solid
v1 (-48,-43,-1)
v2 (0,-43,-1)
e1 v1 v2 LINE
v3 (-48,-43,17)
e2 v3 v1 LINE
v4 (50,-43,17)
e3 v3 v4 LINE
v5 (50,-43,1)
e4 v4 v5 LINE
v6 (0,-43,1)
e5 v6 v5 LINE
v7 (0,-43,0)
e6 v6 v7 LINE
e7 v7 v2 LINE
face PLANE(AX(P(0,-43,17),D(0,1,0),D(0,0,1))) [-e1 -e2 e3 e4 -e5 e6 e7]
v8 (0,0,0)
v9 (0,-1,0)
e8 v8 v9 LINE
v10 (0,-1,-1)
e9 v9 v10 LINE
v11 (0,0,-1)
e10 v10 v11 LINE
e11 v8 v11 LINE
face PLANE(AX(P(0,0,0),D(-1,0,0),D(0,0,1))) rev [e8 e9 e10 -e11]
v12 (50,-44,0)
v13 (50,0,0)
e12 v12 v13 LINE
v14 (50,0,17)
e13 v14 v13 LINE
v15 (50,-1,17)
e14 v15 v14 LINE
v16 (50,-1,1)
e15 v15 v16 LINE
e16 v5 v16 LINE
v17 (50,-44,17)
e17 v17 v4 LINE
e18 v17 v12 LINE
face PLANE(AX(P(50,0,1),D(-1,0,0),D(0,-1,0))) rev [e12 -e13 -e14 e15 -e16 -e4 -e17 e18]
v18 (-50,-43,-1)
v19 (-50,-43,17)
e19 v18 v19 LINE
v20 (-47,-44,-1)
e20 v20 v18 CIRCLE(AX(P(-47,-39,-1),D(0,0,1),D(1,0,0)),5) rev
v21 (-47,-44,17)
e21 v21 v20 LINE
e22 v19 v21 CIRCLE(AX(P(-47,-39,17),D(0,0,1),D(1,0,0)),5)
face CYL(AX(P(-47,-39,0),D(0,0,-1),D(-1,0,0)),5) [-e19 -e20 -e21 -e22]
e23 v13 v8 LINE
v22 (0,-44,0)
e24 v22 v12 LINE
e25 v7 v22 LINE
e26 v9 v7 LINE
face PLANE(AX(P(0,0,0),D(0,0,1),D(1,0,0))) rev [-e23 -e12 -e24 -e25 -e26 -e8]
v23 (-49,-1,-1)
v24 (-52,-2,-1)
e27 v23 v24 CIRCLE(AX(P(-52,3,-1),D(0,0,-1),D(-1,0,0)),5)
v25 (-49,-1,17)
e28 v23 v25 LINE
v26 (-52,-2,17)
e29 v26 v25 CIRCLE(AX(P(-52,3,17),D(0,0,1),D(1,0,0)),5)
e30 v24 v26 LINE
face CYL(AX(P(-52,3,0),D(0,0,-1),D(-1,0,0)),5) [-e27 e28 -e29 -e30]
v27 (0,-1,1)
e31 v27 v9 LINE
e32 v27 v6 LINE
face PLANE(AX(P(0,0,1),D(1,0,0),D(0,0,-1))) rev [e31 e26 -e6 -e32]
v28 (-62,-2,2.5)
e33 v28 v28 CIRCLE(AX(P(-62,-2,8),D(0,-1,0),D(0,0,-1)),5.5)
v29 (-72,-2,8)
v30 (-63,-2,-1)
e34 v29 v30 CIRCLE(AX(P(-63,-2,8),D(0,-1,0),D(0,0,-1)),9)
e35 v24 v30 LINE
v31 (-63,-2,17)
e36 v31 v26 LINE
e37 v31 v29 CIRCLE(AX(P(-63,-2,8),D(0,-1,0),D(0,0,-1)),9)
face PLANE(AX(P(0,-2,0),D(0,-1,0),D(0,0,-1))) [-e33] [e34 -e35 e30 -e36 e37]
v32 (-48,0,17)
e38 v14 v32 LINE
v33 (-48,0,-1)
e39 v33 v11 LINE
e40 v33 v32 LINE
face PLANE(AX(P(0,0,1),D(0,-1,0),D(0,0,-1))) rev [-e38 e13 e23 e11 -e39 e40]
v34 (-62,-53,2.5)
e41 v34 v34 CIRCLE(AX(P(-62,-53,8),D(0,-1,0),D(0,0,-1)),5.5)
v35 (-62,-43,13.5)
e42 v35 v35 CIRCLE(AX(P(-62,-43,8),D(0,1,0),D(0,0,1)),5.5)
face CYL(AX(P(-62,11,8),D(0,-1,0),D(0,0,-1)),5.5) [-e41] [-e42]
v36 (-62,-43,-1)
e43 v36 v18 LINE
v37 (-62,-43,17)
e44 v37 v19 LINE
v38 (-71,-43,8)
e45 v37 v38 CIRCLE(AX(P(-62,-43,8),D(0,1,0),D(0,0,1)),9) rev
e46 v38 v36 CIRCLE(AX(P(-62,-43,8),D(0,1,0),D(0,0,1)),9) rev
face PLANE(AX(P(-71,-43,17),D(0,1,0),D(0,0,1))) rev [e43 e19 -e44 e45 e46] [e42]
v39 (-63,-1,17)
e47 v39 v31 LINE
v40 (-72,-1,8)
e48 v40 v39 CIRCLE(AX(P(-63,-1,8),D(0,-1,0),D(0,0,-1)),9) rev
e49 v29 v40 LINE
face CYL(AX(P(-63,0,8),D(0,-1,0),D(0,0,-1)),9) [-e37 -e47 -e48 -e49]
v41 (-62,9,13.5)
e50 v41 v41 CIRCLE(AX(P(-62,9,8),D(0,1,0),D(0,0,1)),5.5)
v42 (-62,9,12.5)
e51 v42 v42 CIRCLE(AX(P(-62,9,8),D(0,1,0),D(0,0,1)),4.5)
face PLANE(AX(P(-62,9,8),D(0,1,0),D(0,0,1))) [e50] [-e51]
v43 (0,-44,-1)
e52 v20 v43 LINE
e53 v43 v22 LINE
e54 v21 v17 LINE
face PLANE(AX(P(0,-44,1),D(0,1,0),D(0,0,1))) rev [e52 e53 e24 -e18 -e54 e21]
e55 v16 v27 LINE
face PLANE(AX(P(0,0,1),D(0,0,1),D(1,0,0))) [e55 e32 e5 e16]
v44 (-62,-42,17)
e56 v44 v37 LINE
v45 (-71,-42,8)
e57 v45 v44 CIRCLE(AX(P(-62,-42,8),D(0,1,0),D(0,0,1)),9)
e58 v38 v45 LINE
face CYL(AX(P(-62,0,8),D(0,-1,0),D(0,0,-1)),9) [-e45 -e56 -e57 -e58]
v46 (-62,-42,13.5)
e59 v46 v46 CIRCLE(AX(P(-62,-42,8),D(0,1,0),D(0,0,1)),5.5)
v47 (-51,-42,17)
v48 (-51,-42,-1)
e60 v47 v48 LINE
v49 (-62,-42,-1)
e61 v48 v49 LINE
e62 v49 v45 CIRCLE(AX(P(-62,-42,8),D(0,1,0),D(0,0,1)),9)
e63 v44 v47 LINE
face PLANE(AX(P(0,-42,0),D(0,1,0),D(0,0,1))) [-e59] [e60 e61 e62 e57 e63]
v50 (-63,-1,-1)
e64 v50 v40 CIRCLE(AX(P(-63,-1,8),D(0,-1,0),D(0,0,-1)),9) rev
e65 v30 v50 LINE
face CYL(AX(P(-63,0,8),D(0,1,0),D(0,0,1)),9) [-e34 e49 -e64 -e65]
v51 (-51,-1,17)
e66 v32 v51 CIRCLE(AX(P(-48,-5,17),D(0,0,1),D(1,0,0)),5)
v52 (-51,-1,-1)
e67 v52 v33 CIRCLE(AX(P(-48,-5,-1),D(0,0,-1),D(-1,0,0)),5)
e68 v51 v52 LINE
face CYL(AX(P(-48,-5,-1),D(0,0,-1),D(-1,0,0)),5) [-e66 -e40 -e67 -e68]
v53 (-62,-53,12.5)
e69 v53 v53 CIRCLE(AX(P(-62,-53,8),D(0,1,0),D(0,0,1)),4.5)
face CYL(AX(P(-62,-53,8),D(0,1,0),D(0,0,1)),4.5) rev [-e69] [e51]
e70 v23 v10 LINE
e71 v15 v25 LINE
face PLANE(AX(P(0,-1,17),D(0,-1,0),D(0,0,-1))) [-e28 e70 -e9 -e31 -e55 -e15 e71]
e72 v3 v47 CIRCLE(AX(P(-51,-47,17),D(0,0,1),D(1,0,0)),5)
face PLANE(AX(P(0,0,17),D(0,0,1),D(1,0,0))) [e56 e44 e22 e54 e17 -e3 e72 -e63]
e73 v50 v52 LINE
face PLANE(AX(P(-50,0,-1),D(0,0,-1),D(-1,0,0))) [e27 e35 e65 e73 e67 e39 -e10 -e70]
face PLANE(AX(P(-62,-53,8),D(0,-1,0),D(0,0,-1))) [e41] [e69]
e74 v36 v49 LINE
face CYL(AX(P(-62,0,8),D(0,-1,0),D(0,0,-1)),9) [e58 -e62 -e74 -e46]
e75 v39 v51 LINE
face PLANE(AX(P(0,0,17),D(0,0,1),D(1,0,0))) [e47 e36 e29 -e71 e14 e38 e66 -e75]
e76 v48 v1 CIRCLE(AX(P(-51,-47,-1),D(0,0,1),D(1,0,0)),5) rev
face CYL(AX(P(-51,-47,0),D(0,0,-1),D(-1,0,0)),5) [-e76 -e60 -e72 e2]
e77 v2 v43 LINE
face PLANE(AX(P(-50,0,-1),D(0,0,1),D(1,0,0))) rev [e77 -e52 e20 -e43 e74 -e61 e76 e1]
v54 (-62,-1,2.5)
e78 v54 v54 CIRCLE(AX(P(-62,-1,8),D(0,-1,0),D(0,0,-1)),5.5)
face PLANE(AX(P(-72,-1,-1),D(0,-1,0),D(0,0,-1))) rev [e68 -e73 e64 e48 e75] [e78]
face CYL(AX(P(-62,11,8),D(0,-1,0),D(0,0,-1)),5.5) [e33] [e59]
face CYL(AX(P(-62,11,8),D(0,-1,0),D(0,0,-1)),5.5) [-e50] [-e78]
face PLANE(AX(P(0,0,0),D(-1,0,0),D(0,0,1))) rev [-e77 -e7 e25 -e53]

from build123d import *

# Parameters (mm, degrees)
CROQUIS1_W                    = 50
CROQUIS1_H                    = 44
SALIENTE_EXTRUIR1_DEPTH       = 1
CROQUIS2_W                    = 50
CROQUIS2_H                    = 1
SALIENTE_EXTRUIR2_DEPTH       = 16
CROQUIS3_W                    = 1
CROQUIS3_H                    = 1
SALIENTE_EXTRUIR3_DEPTH       = 50
CROQUIS4_W                    = 1
CROQUIS4_H                    = 18
SALIENTE_EXTRUIR4_DEPTH       = 1
CROQUIS6_W                    = 1
CROQUIS6_H                    = 18
SALIENTE_EXTRUIR5_DEPTH       = 1
CROQUIS12_W                   = 1
CROQUIS12_H                   = 18
SALIENTE_EXTRUIR11_DEPTH      = 1
CROQUIS13_W                   = 18
CROQUIS13_H                   = 1
SALIENTE_EXTRUIR12_DEPTH      = 21
CROQUIS14_W                   = 18
CROQUIS14_H                   = 1
SALIENTE_EXTRUIR13_DEPTH      = 21
REDONDEO4_R                   = 9
REDONDEO5_R                   = 9
CROQUIS15_W                   = 18
CROQUIS15_H                   = 1
SALIENTE_EXTRUIR14_DEPTH      = 1
CROQUIS16_W                   = 18
CROQUIS16_H                   = 1
SALIENTE_EXTRUIR15_DEPTH      = 1
REDONDEO6_R                   = 5
REDONDEO7_R                   = 5
SALIENTE_EXTRUIR22_DEPTH      = 10
SALIENTE_EXTRUIR22_DEPTH_BACK = 54
CROQUIS17_R                   = 5.5
CORTAR_EXTRUIR5_START         = -2
CROQUIS25_R                   = 5.5
CORTAR_EXTRUIR5_DEPTH         = 2
CROQUIS26_R                   = 4.5
CORTAR_EXTRUIR6_DEPTH         = 97.524608261


# Some blends are built 0.0001 mm under size
with BuildPart() as part:
    # Croquis1 → Saliente-Extruir1 (new body)
    with BuildSketch(Plane.XY):
        with Locations((25, -22)):
            Rectangle(CROQUIS1_W, CROQUIS1_H)
    extrude(amount=SALIENTE_EXTRUIR1_DEPTH)

    # Croquis2 → Saliente-Extruir2 (add)
    with BuildSketch(Plane.XY.offset(1)):
        with Locations((25, -0.5)):
            Rectangle(CROQUIS2_W, CROQUIS2_H)
        with Locations((25, -43.5)):
            Rectangle(CROQUIS2_W, CROQUIS2_H)
    extrude(amount=SALIENTE_EXTRUIR2_DEPTH)

    # Croquis3 → Saliente-Extruir3 (add)
    with BuildSketch(Plane.ZY):
        Polygon((0, -44), (17, -44), (17, -43), (1, -43), (0, -43), align=None)
        with Locations((-0.5, -43.5)):
            Rectangle(CROQUIS3_W, CROQUIS3_H)
        with Locations((-0.5, -0.5)):
            Rectangle(CROQUIS3_W, CROQUIS3_H)
        Polygon((0, 0), (0, -1), (1, -1), (17, -1), (17, 0), align=None)
    extrude(amount=SALIENTE_EXTRUIR3_DEPTH)



with BuildPart() as body_2:
    # Croquis4 → Saliente-Extruir4 (new body)
    with BuildSketch(Plane.XZ.offset(1)):
        with Locations((-50.5, 8)):
            Rectangle(CROQUIS4_W, CROQUIS4_H)
    extrude(amount=SALIENTE_EXTRUIR4_DEPTH)


with BuildPart() as part_1:
    add(part.part)

    add(body_2.part)  # Saliente-Extruir5 merges body 2
    # Croquis6 → Saliente-Extruir5 (add)
    with BuildSketch(Plane(origin=(0, -1, 0), x_dir=(1, 0, 0), z_dir=(0, 1, 0))):
        with Locations((-50.5, -8)):
            Rectangle(CROQUIS6_W, CROQUIS6_H)
    extrude(amount=SALIENTE_EXTRUIR5_DEPTH)

    # Croquis12 → Saliente-Extruir11 (add)
    with BuildSketch(Plane(origin=(0, -43, 0), x_dir=(1, 0, 0), z_dir=(0, 1, 0))):
        with Locations((-49.5, -8)):
            Rectangle(CROQUIS12_W, CROQUIS12_H)
    extrude(amount=SALIENTE_EXTRUIR11_DEPTH)

    # Croquis13 → Saliente-Extruir12 (add)
    with BuildSketch(Plane.ZY.offset(50)):
        with Locations((8, -42.5)):
            Rectangle(CROQUIS13_W, CROQUIS13_H)
    extrude(amount=SALIENTE_EXTRUIR12_DEPTH)

    # Croquis14 → Saliente-Extruir13 (add)
    with BuildSketch(Plane.ZY.offset(51)):
        with Locations((8, -1.5)):
            Rectangle(CROQUIS14_W, CROQUIS14_H)
    extrude(amount=SALIENTE_EXTRUIR13_DEPTH)

    # Redondeo4
    redondeo4_edges = [part_1.edges().sort_by_distance(p)[0] for p in [
        (-72, -1.5, -1),
        (-72, -1.5, 17),
    ]]
    fillet(redondeo4_edges, radius=REDONDEO4_R - 0.0001)  # a hair under: the kernel refuses the full size

    # Redondeo5
    redondeo5_edges = [part_1.edges().sort_by_distance(p)[0] for p in [
        (-71, -42.5, -1),
        (-71, -42.5, 17),
    ]]
    fillet(redondeo5_edges, radius=REDONDEO5_R - 0.0001)  # a hair under: the kernel refuses the full size

    # Croquis15 → Saliente-Extruir14 (add)
    with BuildSketch(Plane(origin=(-49, 0, 0), x_dir=(0, 0, -1), z_dir=(1, 0, 0))):
        with Locations((-8, -42.5)):
            Rectangle(CROQUIS15_W, CROQUIS15_H)
    extrude(amount=SALIENTE_EXTRUIR14_DEPTH)

    # Croquis16 → Saliente-Extruir15 (add)
    with BuildSketch(Plane(origin=(-50, 0, 0), x_dir=(0, 0, -1), z_dir=(1, 0, 0))):
        with Locations((-8, -1.5)):
            Rectangle(CROQUIS16_W, CROQUIS16_H)
    extrude(amount=SALIENTE_EXTRUIR15_DEPTH)

    # Redondeo6
    # the kernel refuses this fillet: 5 mm, written as the material it takes off along each edge
    with BuildSketch(Plane(origin=(-48, -42, -8.5), x_dir=(-1, 0, 0), z_dir=(0, 0, 1))) as redondeo6_piece_1:
        with BuildLine():
            CenterArc((3, 5), REDONDEO6_R, 233.130102354, 36.869897646)
            Line((0, 1), (-0.06, 0.92))
            ThreePointArc((-0.06, 0.92), (-0.1, 0.5), (-0.1, 0))
            Line((-0.1, 0), (0, -0.1))
            Line((0, -0.1), (3, -0.1))
            Line((3, -0.1), (3, 0))
        make_face()
    extrude(amount=33, mode=Mode.SUBTRACT)
    with BuildSketch(Plane(origin=(-49, -2, -8.5), x_dir=(0, 1, 0), z_dir=(0, 0, 1))) as redondeo6_piece_2:
        with BuildLine():
            CenterArc((5, 3), REDONDEO6_R, 180, 36.869897646)
            Line((0, 3), (-0.1, 3))
            Line((-0.1, 3), (-0.1, 0))
            Line((-0.1, 0), (0, -0.1))
            ThreePointArc((0, -0.1), (0.5, -0.1), (0.92, -0.06))
            Line((0.92, -0.06), (1, 0))
        make_face()
    extrude(amount=33, mode=Mode.SUBTRACT)

    # Redondeo7
    # the kernel refuses this fillet: 5 mm, written as the material it takes off along each edge
    with BuildSketch(Plane(origin=(-50, -44, 24.5), x_dir=(1, 0, 0), z_dir=(0, 0, -1)), Plane(origin=(-51, 0, -8.5), x_dir=(1, 0, 0), z_dir=(0, 0, 1))) as redondeo7_piece_1:
        with BuildLine():
            CenterArc((3, -5), REDONDEO7_R, 90, 36.869897646)
            Line((0, -1), (-0.06, -0.92))
            ThreePointArc((-0.06, -0.92), (-0.1, -0.5), (-0.1, 0))
            Line((-0.1, 0), (0, 0.1))
            Line((0, 0.1), (3, 0.1))
            Line((3, 0.1), (3, 0))
        make_face()
    extrude(amount=33, mode=Mode.SUBTRACT)

    # Croquis17 → Saliente-Extruir22 (add, two sides: drawn at the far end of the back side and taken through both)
    with BuildSketch(Plane.XZ.offset(43).offset(-SALIENTE_EXTRUIR22_DEPTH_BACK)):
        with Locations(Location((-62, 8, 0), (0, 0, 270))):
            Circle(CROQUIS17_R)
    extrude(amount=SALIENTE_EXTRUIR22_DEPTH + SALIENTE_EXTRUIR22_DEPTH_BACK)

    # Croquis25 → Cortar-Extruir5 (cut)
    with BuildSketch(Plane(origin=(0, 11, 0), x_dir=(1, 0, 0), z_dir=(0, 1, 0)).offset(CORTAR_EXTRUIR5_START)):
        with Locations(Location((-62, -8, 0), (0, 0, 90))):
            Circle(CROQUIS25_R)
    extrude(amount=CORTAR_EXTRUIR5_DEPTH, mode=Mode.SUBTRACT)

    # Croquis26 → Cortar-Extruir6 (cut, through all)
    with BuildSketch(Plane(origin=(0, 9, 0), x_dir=(1, 0, 0), z_dir=(0, 1, 0))):
        with Locations(Location((-62, -8, 0), (0, 0, 270))):
            Circle(CROQUIS26_R)
    extrude(amount=-CORTAR_EXTRUIR6_DEPTH, mode=Mode.SUBTRACT)


solid = part_1.part
